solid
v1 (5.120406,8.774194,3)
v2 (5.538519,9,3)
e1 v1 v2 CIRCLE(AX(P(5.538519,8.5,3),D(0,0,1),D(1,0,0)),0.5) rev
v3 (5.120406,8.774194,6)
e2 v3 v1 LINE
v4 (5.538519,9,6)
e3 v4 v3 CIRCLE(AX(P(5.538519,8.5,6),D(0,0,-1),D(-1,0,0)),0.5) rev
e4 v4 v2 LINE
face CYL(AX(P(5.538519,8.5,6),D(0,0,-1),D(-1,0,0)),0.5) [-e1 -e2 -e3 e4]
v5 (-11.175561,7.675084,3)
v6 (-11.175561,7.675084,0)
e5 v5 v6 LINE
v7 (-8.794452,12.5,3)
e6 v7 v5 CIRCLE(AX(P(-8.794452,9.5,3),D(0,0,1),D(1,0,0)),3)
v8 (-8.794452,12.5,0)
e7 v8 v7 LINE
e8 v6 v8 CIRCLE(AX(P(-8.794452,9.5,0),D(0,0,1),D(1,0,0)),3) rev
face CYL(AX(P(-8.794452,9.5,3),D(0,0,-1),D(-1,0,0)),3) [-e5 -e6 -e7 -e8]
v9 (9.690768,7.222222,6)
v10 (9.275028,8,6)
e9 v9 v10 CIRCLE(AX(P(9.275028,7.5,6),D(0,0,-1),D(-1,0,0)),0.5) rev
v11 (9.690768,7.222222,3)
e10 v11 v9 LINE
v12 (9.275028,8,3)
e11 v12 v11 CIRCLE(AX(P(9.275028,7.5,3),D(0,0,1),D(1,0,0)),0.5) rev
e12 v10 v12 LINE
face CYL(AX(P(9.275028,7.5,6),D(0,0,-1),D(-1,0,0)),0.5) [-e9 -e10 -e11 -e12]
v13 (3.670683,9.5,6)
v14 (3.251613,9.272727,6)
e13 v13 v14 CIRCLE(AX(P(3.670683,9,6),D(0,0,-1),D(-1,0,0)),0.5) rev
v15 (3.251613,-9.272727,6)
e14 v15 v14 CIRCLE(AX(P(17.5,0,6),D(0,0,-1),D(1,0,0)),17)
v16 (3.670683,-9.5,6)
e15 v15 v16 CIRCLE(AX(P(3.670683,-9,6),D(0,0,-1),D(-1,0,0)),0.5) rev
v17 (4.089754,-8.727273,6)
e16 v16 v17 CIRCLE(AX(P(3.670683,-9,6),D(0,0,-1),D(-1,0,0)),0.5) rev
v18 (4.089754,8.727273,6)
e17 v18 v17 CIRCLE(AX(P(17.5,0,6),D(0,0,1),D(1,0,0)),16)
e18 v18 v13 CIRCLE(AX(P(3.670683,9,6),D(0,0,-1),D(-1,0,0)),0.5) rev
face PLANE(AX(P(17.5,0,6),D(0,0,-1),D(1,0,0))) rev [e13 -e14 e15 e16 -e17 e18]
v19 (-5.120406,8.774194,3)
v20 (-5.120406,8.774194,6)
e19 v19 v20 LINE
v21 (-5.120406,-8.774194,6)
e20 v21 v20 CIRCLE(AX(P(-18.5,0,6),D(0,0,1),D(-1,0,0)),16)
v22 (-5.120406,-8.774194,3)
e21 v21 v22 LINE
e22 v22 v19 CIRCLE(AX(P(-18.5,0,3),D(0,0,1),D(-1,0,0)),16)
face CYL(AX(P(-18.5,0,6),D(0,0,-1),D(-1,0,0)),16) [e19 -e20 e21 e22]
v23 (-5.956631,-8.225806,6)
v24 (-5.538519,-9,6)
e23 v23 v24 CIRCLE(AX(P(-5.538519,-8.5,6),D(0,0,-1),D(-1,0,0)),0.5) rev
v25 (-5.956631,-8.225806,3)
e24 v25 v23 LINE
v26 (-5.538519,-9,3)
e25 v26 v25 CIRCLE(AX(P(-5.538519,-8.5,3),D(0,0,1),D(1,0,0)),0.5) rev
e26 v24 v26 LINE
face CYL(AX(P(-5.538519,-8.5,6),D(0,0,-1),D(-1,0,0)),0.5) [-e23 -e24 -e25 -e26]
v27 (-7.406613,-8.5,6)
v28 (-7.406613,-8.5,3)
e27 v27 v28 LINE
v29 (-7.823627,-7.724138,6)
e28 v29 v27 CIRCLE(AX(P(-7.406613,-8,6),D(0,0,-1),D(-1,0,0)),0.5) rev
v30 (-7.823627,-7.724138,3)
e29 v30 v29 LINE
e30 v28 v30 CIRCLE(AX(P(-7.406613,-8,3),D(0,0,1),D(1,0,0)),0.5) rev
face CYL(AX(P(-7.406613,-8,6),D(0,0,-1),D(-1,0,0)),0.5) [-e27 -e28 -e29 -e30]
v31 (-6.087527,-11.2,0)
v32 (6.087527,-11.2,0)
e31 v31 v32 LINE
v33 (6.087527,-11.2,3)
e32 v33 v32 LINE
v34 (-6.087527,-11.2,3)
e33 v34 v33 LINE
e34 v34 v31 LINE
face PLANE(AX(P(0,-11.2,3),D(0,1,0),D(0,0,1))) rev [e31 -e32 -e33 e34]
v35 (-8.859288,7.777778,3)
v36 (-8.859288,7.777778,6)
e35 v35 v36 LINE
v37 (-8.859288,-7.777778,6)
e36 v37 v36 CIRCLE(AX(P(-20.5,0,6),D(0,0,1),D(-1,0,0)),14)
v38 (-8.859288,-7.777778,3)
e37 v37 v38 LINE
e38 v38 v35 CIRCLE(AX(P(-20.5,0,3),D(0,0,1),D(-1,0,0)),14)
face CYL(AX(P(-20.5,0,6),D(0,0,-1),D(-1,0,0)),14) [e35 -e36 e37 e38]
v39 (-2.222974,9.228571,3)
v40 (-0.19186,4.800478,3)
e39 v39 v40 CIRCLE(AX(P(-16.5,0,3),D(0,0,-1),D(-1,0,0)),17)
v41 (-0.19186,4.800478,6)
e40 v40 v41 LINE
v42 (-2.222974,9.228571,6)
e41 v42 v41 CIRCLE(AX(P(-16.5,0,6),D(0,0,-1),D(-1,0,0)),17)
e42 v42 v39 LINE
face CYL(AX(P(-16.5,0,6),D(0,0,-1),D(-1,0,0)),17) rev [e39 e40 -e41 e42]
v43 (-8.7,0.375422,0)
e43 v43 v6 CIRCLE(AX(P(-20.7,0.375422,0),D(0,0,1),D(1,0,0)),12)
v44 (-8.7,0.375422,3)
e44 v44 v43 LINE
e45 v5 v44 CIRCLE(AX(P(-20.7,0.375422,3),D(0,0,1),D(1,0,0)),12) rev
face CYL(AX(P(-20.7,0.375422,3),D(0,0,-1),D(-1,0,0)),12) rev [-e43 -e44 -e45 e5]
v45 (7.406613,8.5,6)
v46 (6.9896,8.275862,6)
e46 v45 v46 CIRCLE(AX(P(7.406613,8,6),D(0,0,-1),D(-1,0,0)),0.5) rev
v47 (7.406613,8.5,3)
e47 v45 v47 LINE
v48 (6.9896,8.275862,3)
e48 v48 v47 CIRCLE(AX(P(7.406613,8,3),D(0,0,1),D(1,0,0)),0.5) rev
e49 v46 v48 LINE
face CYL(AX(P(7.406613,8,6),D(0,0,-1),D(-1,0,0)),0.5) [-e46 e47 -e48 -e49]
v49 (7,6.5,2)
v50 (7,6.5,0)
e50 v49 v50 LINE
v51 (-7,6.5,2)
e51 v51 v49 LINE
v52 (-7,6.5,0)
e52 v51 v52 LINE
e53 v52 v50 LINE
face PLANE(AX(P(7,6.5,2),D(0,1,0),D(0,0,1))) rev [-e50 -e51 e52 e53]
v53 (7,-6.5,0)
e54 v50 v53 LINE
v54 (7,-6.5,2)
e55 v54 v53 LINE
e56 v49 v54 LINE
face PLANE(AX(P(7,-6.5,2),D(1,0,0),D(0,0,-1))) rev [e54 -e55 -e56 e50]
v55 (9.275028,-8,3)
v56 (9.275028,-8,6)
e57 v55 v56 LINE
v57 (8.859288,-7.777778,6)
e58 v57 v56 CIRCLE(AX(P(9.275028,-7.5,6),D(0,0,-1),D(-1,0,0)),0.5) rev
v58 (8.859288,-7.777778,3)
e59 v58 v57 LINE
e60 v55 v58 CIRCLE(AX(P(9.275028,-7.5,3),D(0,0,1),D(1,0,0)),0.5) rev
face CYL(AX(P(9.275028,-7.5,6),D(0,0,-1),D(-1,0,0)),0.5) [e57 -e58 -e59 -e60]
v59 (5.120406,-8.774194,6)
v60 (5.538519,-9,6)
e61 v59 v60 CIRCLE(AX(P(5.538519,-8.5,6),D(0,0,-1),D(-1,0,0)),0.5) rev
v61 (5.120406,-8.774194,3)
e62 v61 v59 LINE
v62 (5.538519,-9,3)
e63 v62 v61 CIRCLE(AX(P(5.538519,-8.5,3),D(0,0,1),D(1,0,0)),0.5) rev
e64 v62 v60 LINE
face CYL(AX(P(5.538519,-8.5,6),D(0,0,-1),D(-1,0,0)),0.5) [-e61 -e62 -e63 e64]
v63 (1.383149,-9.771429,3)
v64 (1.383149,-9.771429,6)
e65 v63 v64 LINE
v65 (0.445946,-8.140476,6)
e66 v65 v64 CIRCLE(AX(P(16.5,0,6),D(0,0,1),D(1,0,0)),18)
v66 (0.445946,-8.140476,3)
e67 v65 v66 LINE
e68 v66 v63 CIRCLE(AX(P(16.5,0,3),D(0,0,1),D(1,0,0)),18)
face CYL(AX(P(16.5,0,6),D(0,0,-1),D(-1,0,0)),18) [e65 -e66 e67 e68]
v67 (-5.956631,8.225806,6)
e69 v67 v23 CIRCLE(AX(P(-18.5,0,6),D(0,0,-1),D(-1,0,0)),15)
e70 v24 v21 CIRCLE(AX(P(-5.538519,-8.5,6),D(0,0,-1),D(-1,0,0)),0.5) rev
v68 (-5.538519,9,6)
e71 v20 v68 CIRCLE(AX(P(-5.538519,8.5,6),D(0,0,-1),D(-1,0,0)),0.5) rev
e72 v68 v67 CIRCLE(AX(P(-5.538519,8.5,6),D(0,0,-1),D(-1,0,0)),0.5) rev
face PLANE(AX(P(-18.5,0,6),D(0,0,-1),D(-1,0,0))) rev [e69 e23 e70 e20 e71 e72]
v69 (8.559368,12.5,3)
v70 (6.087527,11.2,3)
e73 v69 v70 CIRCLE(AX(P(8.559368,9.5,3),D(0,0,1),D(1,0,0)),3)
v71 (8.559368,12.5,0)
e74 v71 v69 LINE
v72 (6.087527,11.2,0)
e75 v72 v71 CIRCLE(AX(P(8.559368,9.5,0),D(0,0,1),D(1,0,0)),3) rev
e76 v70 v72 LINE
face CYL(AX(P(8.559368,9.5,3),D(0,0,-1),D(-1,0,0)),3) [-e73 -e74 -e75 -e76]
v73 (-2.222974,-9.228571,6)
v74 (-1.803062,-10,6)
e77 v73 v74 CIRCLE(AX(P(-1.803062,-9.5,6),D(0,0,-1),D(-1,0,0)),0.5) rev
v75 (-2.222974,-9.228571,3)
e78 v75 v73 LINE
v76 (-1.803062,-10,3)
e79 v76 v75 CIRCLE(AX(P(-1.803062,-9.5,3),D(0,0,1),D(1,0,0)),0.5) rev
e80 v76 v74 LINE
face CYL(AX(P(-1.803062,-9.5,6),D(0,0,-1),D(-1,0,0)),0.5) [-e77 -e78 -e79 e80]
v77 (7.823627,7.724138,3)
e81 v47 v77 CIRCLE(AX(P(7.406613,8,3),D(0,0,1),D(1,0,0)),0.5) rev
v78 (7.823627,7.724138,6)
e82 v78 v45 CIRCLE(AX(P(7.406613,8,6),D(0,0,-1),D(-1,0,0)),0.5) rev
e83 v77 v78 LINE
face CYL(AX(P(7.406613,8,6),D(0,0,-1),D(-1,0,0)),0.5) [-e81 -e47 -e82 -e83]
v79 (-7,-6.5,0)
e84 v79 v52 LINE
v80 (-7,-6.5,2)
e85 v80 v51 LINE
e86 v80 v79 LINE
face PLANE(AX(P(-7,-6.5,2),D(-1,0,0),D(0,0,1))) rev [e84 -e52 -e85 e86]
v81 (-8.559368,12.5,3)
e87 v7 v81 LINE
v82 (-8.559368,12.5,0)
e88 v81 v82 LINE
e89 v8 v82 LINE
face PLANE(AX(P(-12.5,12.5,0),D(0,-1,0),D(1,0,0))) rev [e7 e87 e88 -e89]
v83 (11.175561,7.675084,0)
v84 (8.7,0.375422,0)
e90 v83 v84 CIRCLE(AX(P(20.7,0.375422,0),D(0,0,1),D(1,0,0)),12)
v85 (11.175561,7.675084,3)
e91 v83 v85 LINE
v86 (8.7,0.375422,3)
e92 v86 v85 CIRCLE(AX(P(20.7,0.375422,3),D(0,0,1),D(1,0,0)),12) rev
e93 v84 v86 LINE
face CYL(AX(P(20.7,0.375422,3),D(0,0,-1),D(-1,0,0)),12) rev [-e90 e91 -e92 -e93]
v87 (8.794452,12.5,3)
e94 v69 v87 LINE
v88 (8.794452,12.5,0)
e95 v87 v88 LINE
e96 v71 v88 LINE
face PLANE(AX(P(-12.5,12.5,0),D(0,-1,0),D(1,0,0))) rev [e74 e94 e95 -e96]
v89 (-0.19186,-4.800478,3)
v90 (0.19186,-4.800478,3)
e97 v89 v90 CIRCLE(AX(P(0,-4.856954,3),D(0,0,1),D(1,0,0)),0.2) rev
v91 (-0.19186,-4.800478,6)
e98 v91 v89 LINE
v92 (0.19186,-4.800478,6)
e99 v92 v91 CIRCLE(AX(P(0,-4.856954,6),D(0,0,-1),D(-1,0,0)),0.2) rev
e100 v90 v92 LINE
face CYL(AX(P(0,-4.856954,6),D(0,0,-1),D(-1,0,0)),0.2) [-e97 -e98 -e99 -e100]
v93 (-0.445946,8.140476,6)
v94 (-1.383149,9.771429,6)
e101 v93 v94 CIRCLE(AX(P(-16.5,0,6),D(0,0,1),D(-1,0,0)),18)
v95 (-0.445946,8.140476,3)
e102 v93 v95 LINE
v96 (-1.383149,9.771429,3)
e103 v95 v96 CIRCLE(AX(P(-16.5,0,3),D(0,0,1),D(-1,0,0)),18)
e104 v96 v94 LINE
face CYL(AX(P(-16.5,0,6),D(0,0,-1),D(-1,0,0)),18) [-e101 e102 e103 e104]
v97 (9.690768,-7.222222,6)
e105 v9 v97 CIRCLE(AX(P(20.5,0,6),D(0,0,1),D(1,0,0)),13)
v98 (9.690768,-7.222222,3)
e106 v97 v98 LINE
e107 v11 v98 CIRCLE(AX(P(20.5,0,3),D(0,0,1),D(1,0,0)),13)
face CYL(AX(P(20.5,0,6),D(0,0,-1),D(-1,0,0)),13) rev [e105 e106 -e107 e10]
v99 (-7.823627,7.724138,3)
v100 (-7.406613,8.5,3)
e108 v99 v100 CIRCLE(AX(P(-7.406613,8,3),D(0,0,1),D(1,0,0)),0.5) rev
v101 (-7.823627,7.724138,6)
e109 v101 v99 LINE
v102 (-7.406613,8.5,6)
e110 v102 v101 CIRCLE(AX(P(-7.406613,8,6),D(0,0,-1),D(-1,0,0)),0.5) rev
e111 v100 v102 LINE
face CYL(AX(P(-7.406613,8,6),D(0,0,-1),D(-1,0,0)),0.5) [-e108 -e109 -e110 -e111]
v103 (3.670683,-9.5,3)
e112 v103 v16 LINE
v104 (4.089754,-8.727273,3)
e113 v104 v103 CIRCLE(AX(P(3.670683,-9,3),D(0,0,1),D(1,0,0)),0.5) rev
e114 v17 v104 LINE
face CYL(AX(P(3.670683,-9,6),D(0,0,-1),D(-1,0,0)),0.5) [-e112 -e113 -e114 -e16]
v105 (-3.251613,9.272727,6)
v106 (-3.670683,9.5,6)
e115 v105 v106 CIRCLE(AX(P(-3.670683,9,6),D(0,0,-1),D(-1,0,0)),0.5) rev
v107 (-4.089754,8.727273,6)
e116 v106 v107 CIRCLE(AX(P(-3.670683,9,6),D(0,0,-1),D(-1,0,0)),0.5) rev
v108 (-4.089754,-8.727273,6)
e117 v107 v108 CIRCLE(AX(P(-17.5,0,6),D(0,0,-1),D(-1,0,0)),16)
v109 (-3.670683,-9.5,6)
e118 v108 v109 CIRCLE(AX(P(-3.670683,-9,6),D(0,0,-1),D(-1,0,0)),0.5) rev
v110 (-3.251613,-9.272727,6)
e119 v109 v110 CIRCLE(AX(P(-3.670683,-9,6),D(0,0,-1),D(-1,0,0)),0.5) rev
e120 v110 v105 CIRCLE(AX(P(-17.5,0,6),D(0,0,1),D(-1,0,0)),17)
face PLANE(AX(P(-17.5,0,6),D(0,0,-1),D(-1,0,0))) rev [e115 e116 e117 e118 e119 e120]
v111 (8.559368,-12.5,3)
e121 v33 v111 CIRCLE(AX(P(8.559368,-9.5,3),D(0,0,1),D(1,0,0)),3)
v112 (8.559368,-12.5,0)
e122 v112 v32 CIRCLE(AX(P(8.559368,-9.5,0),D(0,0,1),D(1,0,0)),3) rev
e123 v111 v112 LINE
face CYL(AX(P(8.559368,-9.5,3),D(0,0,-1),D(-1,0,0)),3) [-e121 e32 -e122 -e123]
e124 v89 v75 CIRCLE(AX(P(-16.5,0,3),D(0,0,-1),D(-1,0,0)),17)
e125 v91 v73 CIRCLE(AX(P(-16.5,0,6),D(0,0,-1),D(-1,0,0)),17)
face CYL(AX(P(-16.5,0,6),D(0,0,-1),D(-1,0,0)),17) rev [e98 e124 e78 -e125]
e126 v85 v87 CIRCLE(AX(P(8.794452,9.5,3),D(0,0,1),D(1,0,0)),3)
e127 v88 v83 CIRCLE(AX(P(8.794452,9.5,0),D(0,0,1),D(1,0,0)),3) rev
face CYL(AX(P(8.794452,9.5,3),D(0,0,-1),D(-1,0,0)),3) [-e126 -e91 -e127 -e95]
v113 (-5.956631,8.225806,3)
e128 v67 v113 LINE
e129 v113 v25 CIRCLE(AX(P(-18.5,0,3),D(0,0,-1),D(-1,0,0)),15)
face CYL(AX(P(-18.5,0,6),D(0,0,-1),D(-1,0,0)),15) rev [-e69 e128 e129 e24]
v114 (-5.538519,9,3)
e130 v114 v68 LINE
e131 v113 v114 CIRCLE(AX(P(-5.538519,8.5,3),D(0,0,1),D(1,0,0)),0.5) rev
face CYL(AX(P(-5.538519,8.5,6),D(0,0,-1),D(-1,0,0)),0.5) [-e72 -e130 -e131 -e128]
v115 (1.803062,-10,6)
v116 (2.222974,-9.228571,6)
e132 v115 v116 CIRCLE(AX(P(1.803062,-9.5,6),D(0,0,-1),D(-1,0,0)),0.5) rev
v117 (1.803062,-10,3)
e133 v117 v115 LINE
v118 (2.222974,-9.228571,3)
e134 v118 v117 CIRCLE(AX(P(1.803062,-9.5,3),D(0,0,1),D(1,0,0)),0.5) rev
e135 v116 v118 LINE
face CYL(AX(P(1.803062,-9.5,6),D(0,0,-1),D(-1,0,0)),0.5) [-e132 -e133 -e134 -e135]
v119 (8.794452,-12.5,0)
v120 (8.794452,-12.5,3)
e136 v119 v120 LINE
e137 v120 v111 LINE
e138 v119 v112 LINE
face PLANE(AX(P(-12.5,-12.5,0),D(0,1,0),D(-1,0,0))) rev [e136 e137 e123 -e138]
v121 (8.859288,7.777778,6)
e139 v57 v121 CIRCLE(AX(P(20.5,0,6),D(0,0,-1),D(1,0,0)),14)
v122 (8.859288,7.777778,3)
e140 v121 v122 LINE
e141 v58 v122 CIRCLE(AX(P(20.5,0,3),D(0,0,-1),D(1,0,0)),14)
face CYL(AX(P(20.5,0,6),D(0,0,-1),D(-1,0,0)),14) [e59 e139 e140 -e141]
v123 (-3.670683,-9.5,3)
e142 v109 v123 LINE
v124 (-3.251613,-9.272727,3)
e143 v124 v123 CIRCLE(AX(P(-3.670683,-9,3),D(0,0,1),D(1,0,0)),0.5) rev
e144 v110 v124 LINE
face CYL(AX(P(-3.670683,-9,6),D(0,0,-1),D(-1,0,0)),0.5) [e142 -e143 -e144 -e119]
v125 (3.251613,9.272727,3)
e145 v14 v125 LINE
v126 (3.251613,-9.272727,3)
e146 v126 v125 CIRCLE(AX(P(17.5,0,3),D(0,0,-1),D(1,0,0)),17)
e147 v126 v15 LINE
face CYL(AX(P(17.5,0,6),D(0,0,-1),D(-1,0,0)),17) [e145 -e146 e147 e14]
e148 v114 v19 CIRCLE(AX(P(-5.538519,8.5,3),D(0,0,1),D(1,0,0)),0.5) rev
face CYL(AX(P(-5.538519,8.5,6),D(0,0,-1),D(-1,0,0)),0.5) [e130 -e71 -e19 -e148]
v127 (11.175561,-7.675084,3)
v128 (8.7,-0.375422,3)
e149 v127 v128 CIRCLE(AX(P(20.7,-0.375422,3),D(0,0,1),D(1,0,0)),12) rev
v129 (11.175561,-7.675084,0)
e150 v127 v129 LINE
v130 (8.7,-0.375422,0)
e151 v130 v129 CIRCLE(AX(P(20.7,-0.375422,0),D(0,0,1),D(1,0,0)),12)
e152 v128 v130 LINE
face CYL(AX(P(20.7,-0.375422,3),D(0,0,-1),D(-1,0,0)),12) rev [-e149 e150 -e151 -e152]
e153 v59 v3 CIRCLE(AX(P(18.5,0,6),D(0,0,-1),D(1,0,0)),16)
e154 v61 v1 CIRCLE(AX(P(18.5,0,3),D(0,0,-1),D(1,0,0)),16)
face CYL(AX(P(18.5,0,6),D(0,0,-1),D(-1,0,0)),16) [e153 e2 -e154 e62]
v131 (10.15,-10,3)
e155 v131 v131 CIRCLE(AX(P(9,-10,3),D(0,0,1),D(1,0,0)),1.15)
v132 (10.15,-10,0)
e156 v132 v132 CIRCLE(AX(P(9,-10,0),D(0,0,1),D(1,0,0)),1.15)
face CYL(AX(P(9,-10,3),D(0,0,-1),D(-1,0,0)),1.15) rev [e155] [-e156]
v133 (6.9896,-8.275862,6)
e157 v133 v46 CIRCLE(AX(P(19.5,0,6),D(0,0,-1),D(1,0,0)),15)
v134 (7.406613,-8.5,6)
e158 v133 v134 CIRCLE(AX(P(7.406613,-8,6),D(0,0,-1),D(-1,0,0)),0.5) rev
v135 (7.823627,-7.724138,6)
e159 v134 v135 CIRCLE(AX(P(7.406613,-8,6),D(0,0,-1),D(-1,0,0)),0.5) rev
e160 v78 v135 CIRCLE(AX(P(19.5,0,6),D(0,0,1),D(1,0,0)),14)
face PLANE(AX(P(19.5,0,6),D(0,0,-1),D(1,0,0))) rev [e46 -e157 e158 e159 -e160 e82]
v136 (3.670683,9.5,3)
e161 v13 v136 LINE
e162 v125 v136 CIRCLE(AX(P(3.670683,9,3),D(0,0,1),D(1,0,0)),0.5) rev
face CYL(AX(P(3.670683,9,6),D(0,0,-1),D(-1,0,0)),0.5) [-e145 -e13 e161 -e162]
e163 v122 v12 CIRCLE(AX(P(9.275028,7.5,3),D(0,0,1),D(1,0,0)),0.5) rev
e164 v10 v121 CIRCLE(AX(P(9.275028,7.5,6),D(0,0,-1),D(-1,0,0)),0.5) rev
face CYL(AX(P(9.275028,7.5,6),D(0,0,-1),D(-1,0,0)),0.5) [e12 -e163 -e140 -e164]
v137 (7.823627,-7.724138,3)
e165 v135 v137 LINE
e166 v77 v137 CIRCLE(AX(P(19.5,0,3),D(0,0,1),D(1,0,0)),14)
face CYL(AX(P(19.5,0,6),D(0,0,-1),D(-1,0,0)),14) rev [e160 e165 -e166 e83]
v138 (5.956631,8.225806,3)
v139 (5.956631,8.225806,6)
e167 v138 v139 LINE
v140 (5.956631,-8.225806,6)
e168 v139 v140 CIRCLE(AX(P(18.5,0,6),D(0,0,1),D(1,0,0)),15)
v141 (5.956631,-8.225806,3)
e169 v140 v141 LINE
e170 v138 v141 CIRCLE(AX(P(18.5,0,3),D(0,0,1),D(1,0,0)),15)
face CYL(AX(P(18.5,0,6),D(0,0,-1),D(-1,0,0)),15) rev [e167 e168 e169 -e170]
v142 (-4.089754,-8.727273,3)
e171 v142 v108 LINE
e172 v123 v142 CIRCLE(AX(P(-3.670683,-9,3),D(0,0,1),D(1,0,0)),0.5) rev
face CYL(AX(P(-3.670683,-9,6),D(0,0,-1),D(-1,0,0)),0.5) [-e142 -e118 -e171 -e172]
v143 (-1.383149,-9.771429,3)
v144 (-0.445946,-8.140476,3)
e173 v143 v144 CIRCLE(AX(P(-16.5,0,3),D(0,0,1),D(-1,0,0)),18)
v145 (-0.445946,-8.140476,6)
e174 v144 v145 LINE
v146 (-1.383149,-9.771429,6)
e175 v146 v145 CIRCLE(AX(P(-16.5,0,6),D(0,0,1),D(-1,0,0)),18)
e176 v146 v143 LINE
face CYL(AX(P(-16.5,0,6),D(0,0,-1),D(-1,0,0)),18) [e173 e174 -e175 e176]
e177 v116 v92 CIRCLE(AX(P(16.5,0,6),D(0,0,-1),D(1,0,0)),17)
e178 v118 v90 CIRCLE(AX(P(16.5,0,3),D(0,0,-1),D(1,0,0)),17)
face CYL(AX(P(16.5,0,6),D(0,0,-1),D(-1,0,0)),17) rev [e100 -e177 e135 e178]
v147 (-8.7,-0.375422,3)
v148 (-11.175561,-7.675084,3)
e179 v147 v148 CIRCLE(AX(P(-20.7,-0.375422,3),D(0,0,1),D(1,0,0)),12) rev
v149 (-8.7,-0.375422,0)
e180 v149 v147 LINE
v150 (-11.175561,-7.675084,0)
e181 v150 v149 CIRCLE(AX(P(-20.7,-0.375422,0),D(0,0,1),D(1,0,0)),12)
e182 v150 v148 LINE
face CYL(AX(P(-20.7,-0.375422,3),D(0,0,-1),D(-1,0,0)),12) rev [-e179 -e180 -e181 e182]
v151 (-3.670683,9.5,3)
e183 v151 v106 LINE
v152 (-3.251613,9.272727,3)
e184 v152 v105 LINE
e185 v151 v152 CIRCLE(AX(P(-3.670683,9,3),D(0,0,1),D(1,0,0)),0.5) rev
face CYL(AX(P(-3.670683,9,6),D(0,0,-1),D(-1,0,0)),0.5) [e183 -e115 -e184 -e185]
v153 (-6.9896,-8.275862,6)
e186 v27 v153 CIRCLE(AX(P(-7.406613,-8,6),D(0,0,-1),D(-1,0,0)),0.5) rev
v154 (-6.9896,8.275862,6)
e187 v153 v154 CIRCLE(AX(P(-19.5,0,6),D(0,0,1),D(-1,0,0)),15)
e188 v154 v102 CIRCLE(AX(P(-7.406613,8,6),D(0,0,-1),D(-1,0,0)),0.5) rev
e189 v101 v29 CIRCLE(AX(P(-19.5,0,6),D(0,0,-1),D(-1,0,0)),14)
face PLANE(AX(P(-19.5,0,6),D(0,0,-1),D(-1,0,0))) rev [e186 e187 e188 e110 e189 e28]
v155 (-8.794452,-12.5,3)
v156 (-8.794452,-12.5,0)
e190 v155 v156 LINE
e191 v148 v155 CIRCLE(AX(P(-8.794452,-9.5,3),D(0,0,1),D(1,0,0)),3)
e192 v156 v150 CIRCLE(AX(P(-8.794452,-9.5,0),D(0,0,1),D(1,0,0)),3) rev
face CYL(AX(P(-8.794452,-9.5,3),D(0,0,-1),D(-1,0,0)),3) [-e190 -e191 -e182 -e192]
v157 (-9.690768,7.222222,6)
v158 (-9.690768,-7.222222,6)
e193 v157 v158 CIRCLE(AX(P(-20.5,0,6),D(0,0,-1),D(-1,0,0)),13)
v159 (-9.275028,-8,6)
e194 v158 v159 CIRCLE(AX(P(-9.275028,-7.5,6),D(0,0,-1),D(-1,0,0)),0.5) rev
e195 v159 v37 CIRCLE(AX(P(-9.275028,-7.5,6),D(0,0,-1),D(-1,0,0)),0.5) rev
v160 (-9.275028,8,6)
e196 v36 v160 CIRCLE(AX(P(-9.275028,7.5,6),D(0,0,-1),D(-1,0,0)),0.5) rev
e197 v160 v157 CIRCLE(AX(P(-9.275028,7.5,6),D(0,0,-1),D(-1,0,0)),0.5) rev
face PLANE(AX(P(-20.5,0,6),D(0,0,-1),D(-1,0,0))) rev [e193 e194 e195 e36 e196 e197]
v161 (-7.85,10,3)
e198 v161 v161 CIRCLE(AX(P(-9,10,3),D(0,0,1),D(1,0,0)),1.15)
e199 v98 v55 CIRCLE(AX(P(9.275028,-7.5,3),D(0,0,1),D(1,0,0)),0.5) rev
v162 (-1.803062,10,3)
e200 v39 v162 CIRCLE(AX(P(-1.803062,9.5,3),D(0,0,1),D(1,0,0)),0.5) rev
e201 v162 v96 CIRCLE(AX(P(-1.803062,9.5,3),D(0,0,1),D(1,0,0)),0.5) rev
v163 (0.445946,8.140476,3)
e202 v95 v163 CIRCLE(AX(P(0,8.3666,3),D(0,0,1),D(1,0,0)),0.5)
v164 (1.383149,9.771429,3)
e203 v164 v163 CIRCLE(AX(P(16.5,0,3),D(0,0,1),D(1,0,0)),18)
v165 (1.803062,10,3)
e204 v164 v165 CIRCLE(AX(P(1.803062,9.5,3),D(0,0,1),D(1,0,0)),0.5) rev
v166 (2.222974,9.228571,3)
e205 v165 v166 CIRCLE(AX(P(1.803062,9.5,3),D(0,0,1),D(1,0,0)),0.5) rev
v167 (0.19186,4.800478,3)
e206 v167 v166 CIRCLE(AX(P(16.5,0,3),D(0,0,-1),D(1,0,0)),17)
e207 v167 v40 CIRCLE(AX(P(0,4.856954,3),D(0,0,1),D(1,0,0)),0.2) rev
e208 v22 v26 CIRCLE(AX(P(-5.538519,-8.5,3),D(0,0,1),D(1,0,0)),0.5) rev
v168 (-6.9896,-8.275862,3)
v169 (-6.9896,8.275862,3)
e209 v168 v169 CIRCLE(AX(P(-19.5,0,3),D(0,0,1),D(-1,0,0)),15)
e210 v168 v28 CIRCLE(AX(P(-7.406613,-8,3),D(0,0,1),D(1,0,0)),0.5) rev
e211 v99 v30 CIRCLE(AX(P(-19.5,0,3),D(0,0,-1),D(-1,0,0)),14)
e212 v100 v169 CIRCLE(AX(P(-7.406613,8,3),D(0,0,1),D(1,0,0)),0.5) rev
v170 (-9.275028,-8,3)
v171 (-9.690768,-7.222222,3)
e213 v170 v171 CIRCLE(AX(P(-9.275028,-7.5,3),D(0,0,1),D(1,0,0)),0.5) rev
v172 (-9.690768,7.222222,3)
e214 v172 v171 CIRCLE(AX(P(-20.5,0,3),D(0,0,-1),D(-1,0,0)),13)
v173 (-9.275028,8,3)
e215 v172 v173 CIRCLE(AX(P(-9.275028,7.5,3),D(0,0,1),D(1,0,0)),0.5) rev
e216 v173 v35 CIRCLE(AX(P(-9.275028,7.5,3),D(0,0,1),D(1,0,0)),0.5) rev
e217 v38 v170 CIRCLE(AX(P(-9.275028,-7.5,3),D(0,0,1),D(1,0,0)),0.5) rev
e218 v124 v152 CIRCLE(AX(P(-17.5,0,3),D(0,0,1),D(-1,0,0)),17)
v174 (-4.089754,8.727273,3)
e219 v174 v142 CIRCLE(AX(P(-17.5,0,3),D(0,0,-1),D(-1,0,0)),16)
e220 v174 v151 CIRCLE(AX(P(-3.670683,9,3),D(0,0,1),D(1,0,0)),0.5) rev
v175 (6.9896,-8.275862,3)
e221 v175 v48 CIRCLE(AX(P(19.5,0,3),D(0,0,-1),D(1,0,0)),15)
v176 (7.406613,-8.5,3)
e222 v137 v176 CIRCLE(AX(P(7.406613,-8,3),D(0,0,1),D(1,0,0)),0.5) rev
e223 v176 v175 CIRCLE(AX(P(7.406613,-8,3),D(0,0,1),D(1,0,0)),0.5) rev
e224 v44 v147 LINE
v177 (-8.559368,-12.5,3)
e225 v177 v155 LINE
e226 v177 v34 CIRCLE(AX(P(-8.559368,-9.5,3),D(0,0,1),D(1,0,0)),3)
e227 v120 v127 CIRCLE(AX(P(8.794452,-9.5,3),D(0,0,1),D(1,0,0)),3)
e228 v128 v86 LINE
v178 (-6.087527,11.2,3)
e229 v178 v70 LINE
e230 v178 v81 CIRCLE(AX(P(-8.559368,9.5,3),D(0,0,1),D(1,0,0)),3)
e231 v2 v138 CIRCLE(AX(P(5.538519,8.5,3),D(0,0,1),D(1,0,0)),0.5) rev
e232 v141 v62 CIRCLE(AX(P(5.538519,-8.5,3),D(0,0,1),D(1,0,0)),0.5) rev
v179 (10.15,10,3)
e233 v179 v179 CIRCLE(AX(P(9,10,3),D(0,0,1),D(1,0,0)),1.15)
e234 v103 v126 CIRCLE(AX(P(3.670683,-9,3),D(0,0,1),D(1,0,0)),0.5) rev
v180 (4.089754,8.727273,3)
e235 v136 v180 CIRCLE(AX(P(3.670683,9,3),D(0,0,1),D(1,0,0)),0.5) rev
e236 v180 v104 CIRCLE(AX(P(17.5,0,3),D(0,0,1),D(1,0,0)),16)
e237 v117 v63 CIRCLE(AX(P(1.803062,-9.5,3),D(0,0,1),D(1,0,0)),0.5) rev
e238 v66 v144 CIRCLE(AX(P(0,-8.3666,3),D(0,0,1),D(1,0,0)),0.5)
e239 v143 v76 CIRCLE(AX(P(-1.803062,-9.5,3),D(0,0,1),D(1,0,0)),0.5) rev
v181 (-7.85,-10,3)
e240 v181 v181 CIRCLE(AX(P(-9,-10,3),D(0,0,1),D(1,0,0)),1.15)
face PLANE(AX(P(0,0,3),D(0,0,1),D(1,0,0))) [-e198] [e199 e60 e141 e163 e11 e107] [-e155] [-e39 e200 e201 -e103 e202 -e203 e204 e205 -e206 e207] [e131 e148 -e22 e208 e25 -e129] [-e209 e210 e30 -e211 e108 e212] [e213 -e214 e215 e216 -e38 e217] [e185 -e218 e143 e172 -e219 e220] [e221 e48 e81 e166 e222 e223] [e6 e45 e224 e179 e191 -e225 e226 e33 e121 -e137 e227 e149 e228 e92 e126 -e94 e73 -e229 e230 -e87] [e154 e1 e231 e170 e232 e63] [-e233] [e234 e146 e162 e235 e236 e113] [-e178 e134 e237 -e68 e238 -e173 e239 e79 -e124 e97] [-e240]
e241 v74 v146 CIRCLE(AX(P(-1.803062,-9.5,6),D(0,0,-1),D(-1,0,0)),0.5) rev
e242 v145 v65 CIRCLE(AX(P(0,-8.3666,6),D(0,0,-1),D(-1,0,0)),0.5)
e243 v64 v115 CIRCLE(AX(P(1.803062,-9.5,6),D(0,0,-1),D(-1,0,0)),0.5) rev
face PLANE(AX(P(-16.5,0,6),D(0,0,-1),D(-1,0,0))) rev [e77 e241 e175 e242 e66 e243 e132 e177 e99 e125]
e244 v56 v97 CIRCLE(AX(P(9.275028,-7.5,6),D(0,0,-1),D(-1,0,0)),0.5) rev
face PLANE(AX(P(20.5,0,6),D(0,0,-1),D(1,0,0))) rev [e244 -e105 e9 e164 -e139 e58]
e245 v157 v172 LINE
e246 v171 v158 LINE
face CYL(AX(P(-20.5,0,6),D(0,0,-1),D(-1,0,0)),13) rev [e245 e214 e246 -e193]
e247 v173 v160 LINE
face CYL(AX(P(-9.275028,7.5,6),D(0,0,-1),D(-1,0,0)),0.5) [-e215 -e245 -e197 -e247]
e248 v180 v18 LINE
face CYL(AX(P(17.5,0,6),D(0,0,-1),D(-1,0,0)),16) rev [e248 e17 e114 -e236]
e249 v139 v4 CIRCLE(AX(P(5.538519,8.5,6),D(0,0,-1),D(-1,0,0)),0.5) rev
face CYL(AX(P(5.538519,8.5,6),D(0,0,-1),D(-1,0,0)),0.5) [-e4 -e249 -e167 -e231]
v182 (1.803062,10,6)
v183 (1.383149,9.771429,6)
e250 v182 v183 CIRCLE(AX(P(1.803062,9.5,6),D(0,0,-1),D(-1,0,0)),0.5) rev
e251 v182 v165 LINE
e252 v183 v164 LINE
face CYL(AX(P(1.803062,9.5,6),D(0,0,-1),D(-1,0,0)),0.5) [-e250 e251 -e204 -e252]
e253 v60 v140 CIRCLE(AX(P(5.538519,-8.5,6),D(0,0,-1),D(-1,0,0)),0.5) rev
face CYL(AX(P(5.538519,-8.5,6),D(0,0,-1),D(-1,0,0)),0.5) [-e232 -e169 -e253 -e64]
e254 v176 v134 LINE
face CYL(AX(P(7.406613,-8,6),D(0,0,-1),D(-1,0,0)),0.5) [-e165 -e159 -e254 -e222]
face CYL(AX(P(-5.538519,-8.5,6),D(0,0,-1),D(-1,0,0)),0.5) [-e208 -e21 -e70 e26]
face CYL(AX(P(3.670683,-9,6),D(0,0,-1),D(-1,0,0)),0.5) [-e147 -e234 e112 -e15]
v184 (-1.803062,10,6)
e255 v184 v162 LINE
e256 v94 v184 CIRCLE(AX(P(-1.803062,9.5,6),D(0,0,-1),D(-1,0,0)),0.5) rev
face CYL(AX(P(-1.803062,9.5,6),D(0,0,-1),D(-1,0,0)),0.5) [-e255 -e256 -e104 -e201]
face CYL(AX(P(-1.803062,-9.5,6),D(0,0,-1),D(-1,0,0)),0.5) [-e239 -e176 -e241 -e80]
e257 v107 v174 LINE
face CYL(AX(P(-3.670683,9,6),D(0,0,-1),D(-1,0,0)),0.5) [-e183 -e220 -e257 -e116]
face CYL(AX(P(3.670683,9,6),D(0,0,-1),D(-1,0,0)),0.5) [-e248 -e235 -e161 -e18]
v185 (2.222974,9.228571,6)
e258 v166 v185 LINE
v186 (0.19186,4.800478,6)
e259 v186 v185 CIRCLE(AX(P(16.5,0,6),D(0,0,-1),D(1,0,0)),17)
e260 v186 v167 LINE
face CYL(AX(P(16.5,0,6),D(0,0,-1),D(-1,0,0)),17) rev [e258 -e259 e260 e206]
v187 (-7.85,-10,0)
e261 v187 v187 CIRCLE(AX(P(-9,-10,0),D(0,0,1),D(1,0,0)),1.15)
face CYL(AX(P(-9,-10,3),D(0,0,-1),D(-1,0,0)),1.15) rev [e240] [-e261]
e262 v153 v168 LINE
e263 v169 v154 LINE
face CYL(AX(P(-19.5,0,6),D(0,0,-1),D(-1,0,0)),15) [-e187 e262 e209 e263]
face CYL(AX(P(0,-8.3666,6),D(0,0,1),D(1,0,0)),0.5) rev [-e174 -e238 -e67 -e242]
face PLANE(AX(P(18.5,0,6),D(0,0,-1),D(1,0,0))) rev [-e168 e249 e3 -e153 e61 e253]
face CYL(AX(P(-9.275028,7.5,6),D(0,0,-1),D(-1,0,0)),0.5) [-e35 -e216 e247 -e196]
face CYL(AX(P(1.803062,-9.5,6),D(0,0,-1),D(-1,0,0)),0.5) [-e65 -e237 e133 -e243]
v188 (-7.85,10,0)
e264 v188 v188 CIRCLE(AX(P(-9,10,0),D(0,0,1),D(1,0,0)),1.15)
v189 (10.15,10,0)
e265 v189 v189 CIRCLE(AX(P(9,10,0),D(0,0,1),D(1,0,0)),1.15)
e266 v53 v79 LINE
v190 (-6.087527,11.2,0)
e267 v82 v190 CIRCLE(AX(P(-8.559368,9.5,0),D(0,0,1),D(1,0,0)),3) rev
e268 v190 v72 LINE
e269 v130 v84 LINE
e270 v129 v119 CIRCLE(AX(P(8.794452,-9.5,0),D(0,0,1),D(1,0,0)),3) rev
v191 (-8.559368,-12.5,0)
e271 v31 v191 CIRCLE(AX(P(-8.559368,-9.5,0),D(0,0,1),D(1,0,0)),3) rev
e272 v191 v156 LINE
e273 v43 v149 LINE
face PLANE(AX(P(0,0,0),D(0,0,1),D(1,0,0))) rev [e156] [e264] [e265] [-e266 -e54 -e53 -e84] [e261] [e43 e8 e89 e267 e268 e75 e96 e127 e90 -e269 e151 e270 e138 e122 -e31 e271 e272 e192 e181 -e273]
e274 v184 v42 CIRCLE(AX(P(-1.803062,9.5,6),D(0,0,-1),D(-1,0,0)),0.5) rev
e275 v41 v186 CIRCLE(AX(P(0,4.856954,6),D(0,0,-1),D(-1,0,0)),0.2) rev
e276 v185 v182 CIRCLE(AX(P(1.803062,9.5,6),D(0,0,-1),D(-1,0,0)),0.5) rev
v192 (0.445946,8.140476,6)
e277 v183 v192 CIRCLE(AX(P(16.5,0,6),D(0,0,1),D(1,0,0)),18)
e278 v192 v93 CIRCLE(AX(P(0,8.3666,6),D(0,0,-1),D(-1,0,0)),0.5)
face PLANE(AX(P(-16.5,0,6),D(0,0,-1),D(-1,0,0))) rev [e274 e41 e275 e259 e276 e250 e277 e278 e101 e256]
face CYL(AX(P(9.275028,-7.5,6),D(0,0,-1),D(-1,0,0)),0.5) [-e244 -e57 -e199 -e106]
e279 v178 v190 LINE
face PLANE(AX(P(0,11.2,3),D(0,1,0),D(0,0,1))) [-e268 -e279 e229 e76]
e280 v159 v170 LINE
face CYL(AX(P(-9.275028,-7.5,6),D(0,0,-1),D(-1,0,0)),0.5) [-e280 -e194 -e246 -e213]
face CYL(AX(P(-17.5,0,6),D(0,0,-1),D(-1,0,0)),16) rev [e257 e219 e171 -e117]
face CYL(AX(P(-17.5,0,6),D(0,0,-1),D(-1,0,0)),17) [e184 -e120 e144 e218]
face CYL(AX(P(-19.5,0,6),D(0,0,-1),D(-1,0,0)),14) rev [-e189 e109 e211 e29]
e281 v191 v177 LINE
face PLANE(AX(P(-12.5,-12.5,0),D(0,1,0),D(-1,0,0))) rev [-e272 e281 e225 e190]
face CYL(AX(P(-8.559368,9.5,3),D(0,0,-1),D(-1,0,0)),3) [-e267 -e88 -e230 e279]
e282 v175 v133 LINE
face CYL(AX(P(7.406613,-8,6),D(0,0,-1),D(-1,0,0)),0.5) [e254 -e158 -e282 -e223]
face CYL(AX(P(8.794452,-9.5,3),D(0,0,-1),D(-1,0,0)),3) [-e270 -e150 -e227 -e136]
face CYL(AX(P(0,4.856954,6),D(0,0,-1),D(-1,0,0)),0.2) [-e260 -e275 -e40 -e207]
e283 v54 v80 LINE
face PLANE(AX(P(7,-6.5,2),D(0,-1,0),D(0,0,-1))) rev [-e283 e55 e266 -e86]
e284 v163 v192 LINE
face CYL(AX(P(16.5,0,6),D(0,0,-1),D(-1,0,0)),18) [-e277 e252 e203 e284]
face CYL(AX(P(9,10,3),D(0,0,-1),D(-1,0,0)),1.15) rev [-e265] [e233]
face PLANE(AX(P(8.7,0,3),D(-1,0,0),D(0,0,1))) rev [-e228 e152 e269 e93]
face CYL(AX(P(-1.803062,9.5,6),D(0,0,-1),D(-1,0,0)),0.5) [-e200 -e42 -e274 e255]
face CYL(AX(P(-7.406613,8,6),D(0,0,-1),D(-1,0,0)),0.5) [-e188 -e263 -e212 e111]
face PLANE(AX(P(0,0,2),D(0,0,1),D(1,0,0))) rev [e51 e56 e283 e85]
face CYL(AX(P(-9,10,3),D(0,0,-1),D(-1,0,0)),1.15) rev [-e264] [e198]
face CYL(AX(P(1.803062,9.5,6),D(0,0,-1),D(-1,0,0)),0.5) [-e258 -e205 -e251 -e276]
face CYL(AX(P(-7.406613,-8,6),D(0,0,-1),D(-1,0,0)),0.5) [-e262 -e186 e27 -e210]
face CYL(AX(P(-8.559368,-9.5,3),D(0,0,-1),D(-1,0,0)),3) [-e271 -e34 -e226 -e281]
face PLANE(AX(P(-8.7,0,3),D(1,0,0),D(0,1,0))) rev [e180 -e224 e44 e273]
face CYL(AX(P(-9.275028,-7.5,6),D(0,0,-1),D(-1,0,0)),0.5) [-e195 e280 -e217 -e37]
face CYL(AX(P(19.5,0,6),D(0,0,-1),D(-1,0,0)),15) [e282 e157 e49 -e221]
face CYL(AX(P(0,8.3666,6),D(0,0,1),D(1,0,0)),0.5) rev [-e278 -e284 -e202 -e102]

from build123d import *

# Parameters (mm, degrees)
ESQUISSE1_R             = 3.15
ESQUISSE1_R_2           = 1.15
ESQUISSE1_W             = 13.4
ESQUISSE1_H             = 12.4
BOSS_EXTRU_1_DEPTH      = 3
ESQUISSE2_W             = 14
ESQUISSE2_H             = 13
ENL_V_MAT_EXTRU_1_DEPTH = 2
CONG_1_R                = 12
ESQUISSE3_W             = 25
ESQUISSE3_H             = 2
ENL_V_MAT_EXTRU_2_DEPTH = 19.153374342
CONG_2_DEPTH            = 4
BOSS_EXTRU_3_DEPTH      = 3
CONG_4_R                = 0.5
CONG_5_R                = 0.2
SYM_TRIE2_START         = 3
SYM_TRIE2_DEPTH         = 3


with BuildPart() as part:
    # Esquisse1 → Boss.-Extru.1 (new body)
    # profile 1 of 6: a face of its own
    with BuildSketch(Plane.XY):
        with Locations((-9, 10)):
            Circle(ESQUISSE1_R)
        with Locations((-9, 10)):
            Circle(ESQUISSE1_R_2, mode=Mode.SUBTRACT)
    # profile 2 of 6: a face of its own
    with BuildSketch(Plane.XY):
        with BuildLine():
            ThreePointArc((-5.85, 10), (-6.66895946, 7.881332966), (-8.7, 6.864318256))
            Line((-8.7, 6.864318256), (-8.7, -6.864318256))
            ThreePointArc((-8.7, -6.864318256), (-6.66895946, -7.881332966), (-5.85, -10))
            ThreePointArc((-5.85, -10), (-5.909952225, -10.611641029), (-6.087526824, -11.2))
            Line((-6.087526824, -11.2), (6.087526824, -11.2))
            ThreePointArc((6.087526824, -11.2), (6.301939581, -8.374278629), (8.7, -6.864318256))
            Line((8.7, -6.864318256), (8.7, 6.864318256))
            ThreePointArc((8.7, 6.864318256), (6.301939581, 8.374278629), (6.087526824, 11.2))
            Line((6.087526824, 11.2), (-6.087526824, 11.2))
            ThreePointArc((-6.087526824, 11.2), (-5.909952225, 10.611641029), (-5.85, 10))
        make_face()
        Rectangle(ESQUISSE1_W, ESQUISSE1_H, mode=Mode.SUBTRACT)
    # profile 3 of 6: a face of its own
    with BuildSketch(Plane.XY):
        with Locations((9, 10)):
            Circle(ESQUISSE1_R)
        with Locations((9, 10)):
            Circle(ESQUISSE1_R_2, mode=Mode.SUBTRACT)
    # profile 4 of 6: a face of its own
    with BuildSketch(Plane.XY):
        with Locations((9, -10)):
            Circle(ESQUISSE1_R)
        with Locations((9, -10)):
            Circle(ESQUISSE1_R_2, mode=Mode.SUBTRACT)
    # profile 5 of 6: a face of its own
    with BuildSketch(Plane.XY):
        with Locations((-9, -10)):
            Circle(ESQUISSE1_R)
        with Locations((-9, -10)):
            Circle(ESQUISSE1_R_2, mode=Mode.SUBTRACT)
    # profile 6 of 6: a face of its own
    with BuildSketch(Plane.XY):
        Rectangle(ESQUISSE1_W, ESQUISSE1_H)
    extrude(amount=BOSS_EXTRU_1_DEPTH)

    # Esquisse2 → Enlèv. mat.-Extru.1 (cut)
    with BuildSketch(Plane(origin=(0, 0, 0), x_dir=(-1, 0, 0), z_dir=(0, 0, -1))):
        Rectangle(ESQUISSE2_W, ESQUISSE2_H)
    extrude(amount=-ENL_V_MAT_EXTRU_1_DEPTH, mode=Mode.SUBTRACT)

    # Congé1
    cong_1_edges = [part.edges().sort_by_distance(p)[0] for p in [
        (8.7, 6.864318256, 1.5),
        (8.7, -6.864318256, 1.5),
        (-8.7, -6.864318256, 1.5),
        (-8.7, 6.864318256, 1.5),
    ]]
    fillet(cong_1_edges, radius=CONG_1_R)

    # Esquisse3 → Enlèv. mat.-Extru.2 (cut, through all)
    with BuildSketch(Plane.XY.offset(3)):
        with Locations((0, -13.5)):
            Rectangle(ESQUISSE3_W, ESQUISSE3_H)
        with Locations((0, 13.5)):
            Rectangle(ESQUISSE3_W, ESQUISSE3_H)
    extrude(amount=-ENL_V_MAT_EXTRU_2_DEPTH, mode=Mode.SUBTRACT)

    # Congé2: read off the stored shape, not the designer's step
    # Congé2 outline → Congé2 (cut)
    with BuildSketch(Plane.XY):
        with BuildLine():
            ThreePointArc((-11.432673267, 7.998850137), (-11.302722907, 7.838074648), (-11.175561441, 7.675084417))
            ThreePointArc((-11.175561441, 7.675084417), (-11.484688477, 10.827639494), (-8.794451801, 12.5))
            Line((-8.794451801, 12.5), (-10.91637679, 12.5))
            ThreePointArc((-10.91637679, 12.5), (-12.129480248, 10.358961527), (-11.432673267, 7.998850137))
        make_face()
        with BuildLine():
            Line((-7.08362321, 12.5), (-8.559368243, 12.5))
            ThreePointArc((-8.559368243, 12.5), (-7.162944239, 12.155183609), (-6.087526824, 11.2))
            ThreePointArc((-6.087526824, 11.2), (-6.499610431, 11.915868472), (-7.08362321, 12.5))
        make_face()
        with BuildLine():
            Line((10.91637679, 12.5), (8.794451801, 12.5))
            ThreePointArc((8.794451801, 12.5), (11.484688477, 10.827639494), (11.175561441, 7.675084417))
            ThreePointArc((11.175561441, 7.675084417), (11.302722907, 7.838074648), (11.432673267, 7.998850137))
            ThreePointArc((11.432673267, 7.998850137), (12.129480248, 10.358961527), (10.91637679, 12.5))
        make_face()
        with BuildLine():
            ThreePointArc((6.087526824, 11.2), (7.162944239, 12.155183609), (8.559368243, 12.5))
            Line((8.559368243, 12.5), (7.08362321, 12.5))
            ThreePointArc((7.08362321, 12.5), (6.499610431, 11.915868472), (6.087526824, 11.2))
        make_face()
        with BuildLine():
            ThreePointArc((11.432673267, -7.998850137), (11.302722907, -7.838074648), (11.175561441, -7.675084417))
            ThreePointArc((11.175561441, -7.675084417), (11.484688477, -10.827639494), (8.794451801, -12.5))
            Line((8.794451801, -12.5), (10.91637679, -12.5))
            ThreePointArc((10.91637679, -12.5), (12.129480248, -10.358961527), (11.432673267, -7.998850137))
        make_face()
        with BuildLine():
            Line((7.08362321, -12.5), (8.559368243, -12.5))
            ThreePointArc((8.559368243, -12.5), (7.162944239, -12.155183609), (6.087526824, -11.2))
            ThreePointArc((6.087526824, -11.2), (6.499610431, -11.915868472), (7.08362321, -12.5))
        make_face()
        with BuildLine():
            ThreePointArc((-7.08362321, -12.5), (-6.499610431, -11.915868472), (-6.087526824, -11.2))
            ThreePointArc((-6.087526824, -11.2), (-7.162944239, -12.155183609), (-8.559368243, -12.5))
            Line((-8.559368243, -12.5), (-7.08362321, -12.5))
        make_face()
        with BuildLine():
            Line((-10.91637679, -12.5), (-8.794451801, -12.5))
            ThreePointArc((-8.794451801, -12.5), (-11.484688477, -10.827639494), (-11.175561441, -7.675084417))
            ThreePointArc((-11.175561441, -7.675084417), (-11.302722907, -7.838074648), (-11.432673267, -7.998850137))
            ThreePointArc((-11.432673267, -7.998850137), (-12.129480248, -10.358961527), (-10.91637679, -12.5))
        make_face()
    extrude(amount=CONG_2_DEPTH, mode=Mode.SUBTRACT)

    # Esquisse5 → Boss.-Extru.3 (add)
    with BuildSketch(Plane.XY.offset(3)):
        with BuildLine():
            Line((-10.253049234, 8), (-9.010874707, 8))
            ThreePointArc((-9.010874707, 8), (-6.5, 0), (-9.010874707, -8))
            Line((-9.010874707, -8), (-10.253049234, -8))
            ThreePointArc((-10.253049234, -8), (-7.5, 0), (-10.253049234, 8))
        make_face()
        with BuildLine():
            Line((-8.375702269, -8.5), (-7.140792906, -8.5))
            ThreePointArc((-7.140792906, -8.5), (-4.5, 0), (-7.140792906, 8.5))
            Line((-7.140792906, 8.5), (-8.375702269, 8.5))
            ThreePointArc((-8.375702269, 8.5), (-5.5, 0), (-8.375702269, -8.5))
        make_face()
        with BuildLine():
            Line((-6.5, 9), (-5.271243445, 9))
            ThreePointArc((-5.271243445, 9), (-2.5, 0), (-5.271243445, -9))
            Line((-5.271243445, -9), (-6.5, -9))
            ThreePointArc((-6.5, -9), (-3.5, 0), (-6.5, 9))
        make_face()
        with BuildLine():
            Line((-4.62560681, 9.5), (-3.40212782, 9.5))
            ThreePointArc((-3.40212782, 9.5), (-0.5, 0), (-3.40212782, -9.5))
            Line((-3.40212782, -9.5), (-4.62560681, -9.5))
            ThreePointArc((-4.62560681, -9.5), (-1.5, 0), (-4.62560681, 9.5))
        make_face()
        with BuildLine():
            Line((-2.752272915, 10), (-1.533370453, 10))
            ThreePointArc((-1.533370453, 10), (-0.704242426, 8.630993145), (0, 7.193747285))
            ThreePointArc((0, 7.193747285), (0.704242426, 8.630993145), (1.533370453, 10))
            Line((1.533370453, 10), (2.752272915, 10))
            ThreePointArc((2.752272915, 10), (1.090413162, 7.179459136), (0, 4.092676386))
            ThreePointArc((0, 4.092676386), (-1.090413162, 7.179459136), (-2.752272915, 10))
        make_face()
        with BuildLine():
            Line((-2.752272915, -10), (-1.533370453, -10))
            ThreePointArc((-1.533370453, -10), (-0.704242426, -8.630993145), (0, -7.193747285))
            ThreePointArc((0, -7.193747285), (0.704242426, -8.630993145), (1.533370453, -10))
            Line((1.533370453, -10), (2.752272915, -10))
            ThreePointArc((2.752272915, -10), (1.090413162, -7.179459136), (0, -4.092676386))
            ThreePointArc((0, -4.092676386), (-1.090413162, -7.179459136), (-2.752272915, -10))
        make_face()
    extrude(amount=BOSS_EXTRU_3_DEPTH)

    # Congé4
    cong_4_edges = [part.edges().sort_by_distance(p)[0] for p in [
        (2.752272915, 10, 4.5),
        (1.533370453, 10, 4.5),
        (0, 7.193747285, 4.5),
        (-1.533370453, 10, 4.5),
        (-2.752272915, 10, 4.5),
        (-3.40212782, 9.5, 4.5),
        (-4.62560681, 9.5, 4.5),
        (-5.271243445, 9, 4.5),
        (-6.5, 9, 4.5),
        (-7.140792906, 8.5, 4.5),
        (-8.375702269, 8.5, 4.5),
        (-9.010874707, 8, 4.5),
        (-10.253049234, 8, 4.5),
        (0, -7.193747285, 4.5),
        (2.752272915, -10, 4.5),
        (1.533370453, -10, 4.5),
        (-1.533370453, -10, 4.5),
        (-2.752272915, -10, 4.5),
        (-3.40212782, -9.5, 4.5),
        (-4.62560681, -9.5, 4.5),
        (-5.271243445, -9, 4.5),
        (-6.5, -9, 4.5),
        (-7.140792906, -8.5, 4.5),
        (-8.375702269, -8.5, 4.5),
        (-9.010874707, -8, 4.5),
        (-10.253049234, -8, 4.5),
    ]]
    fillet(cong_4_edges, radius=CONG_4_R - 0.0001)  # a hair under: the kernel refuses the full size

    # Congé5
    cong_5_edges = [part.edges().sort_by_distance(p)[0] for p in [
        (0, 4.092676386, 4.5),
        (0, -4.092676386, 4.5),
    ]]
    fillet(cong_5_edges, radius=CONG_5_R)

    # Symétrie2: read off the stored shape, not the designer's step
    # Symétrie2 outline → Symétrie2 (add)
    with BuildSketch(Plane.XY.offset(SYM_TRIE2_START)):
        with BuildLine():
            ThreePointArc((9.27502784, -8), (9.715986392, -7.73570226), (9.690767549, -7.222222222))
            ThreePointArc((9.690767549, -7.222222222), (7.5, 0), (9.690767549, 7.222222222))
            ThreePointArc((9.690767549, 7.222222222), (9.715986392, 7.73570226), (9.27502784, 8))
            ThreePointArc((9.27502784, 8), (9.039325579, 7.940958552), (8.85928813, 7.777777778))
            ThreePointArc((8.85928813, 7.777777778), (6.5, 0), (8.85928813, -7.777777778))
            ThreePointArc((8.85928813, -7.777777778), (9.039325579, -7.940958552), (9.27502784, -8))
        make_face()
        with BuildLine():
            ThreePointArc((7.406613378, -8.5), (7.847028542, -8.236716038), (7.823626709, -7.724137931))
            ThreePointArc((7.823626709, -7.724137931), (5.5, 0), (7.823626709, 7.724137931))
            ThreePointArc((7.823626709, 7.724137931), (7.847028542, 8.236716038), (7.406613378, 8.5))
            ThreePointArc((7.406613378, 8.5), (7.169897339, 8.440415165), (6.989600046, 8.275862069))
            ThreePointArc((6.989600046, 8.275862069), (4.5, 0), (6.989600046, -8.275862069))
            ThreePointArc((6.989600046, -8.275862069), (7.169897339, -8.440415165), (7.406613378, -8.5))
        make_face()
        with BuildLine():
            ThreePointArc((5.538518603, -9), (5.978459948, -8.737595482), (5.956630906, -8.225806452))
            ThreePointArc((5.956630906, -8.225806452), (3.5, 0), (5.956630906, 8.225806452))
            ThreePointArc((5.956630906, 8.225806452), (5.978459948, 8.737595482), (5.538518603, 9))
            ThreePointArc((5.538518603, 9), (5.300923121, 8.939941345), (5.1204063, 8.774193548))
            ThreePointArc((5.1204063, 8.774193548), (2.5, 0), (5.1204063, -8.774193548))
            ThreePointArc((5.1204063, -8.774193548), (5.300923121, -8.939941345), (5.538518603, -9))
        make_face()
        with BuildLine():
            ThreePointArc((3.670683314, -9.5), (4.110207851, -9.238365647), (4.089753517, -8.727272727))
            ThreePointArc((4.089753517, -8.727272727), (1.5, 0), (4.089753517, 8.727272727))
            ThreePointArc((4.089753517, 8.727272727), (4.110207851, 9.238365647), (3.670683314, 9.5))
            ThreePointArc((3.670683314, 9.5), (3.432317667, 9.439524536), (3.251613111, 9.272727273))
            ThreePointArc((3.251613111, 9.272727273), (0.5, 0), (3.251613111, -9.272727273))
            ThreePointArc((3.251613111, -9.272727273), (3.432317667, -9.439524536), (3.670683314, -9.5))
        make_face()
    extrude(amount=SYM_TRIE2_DEPTH)


solid = part.part
